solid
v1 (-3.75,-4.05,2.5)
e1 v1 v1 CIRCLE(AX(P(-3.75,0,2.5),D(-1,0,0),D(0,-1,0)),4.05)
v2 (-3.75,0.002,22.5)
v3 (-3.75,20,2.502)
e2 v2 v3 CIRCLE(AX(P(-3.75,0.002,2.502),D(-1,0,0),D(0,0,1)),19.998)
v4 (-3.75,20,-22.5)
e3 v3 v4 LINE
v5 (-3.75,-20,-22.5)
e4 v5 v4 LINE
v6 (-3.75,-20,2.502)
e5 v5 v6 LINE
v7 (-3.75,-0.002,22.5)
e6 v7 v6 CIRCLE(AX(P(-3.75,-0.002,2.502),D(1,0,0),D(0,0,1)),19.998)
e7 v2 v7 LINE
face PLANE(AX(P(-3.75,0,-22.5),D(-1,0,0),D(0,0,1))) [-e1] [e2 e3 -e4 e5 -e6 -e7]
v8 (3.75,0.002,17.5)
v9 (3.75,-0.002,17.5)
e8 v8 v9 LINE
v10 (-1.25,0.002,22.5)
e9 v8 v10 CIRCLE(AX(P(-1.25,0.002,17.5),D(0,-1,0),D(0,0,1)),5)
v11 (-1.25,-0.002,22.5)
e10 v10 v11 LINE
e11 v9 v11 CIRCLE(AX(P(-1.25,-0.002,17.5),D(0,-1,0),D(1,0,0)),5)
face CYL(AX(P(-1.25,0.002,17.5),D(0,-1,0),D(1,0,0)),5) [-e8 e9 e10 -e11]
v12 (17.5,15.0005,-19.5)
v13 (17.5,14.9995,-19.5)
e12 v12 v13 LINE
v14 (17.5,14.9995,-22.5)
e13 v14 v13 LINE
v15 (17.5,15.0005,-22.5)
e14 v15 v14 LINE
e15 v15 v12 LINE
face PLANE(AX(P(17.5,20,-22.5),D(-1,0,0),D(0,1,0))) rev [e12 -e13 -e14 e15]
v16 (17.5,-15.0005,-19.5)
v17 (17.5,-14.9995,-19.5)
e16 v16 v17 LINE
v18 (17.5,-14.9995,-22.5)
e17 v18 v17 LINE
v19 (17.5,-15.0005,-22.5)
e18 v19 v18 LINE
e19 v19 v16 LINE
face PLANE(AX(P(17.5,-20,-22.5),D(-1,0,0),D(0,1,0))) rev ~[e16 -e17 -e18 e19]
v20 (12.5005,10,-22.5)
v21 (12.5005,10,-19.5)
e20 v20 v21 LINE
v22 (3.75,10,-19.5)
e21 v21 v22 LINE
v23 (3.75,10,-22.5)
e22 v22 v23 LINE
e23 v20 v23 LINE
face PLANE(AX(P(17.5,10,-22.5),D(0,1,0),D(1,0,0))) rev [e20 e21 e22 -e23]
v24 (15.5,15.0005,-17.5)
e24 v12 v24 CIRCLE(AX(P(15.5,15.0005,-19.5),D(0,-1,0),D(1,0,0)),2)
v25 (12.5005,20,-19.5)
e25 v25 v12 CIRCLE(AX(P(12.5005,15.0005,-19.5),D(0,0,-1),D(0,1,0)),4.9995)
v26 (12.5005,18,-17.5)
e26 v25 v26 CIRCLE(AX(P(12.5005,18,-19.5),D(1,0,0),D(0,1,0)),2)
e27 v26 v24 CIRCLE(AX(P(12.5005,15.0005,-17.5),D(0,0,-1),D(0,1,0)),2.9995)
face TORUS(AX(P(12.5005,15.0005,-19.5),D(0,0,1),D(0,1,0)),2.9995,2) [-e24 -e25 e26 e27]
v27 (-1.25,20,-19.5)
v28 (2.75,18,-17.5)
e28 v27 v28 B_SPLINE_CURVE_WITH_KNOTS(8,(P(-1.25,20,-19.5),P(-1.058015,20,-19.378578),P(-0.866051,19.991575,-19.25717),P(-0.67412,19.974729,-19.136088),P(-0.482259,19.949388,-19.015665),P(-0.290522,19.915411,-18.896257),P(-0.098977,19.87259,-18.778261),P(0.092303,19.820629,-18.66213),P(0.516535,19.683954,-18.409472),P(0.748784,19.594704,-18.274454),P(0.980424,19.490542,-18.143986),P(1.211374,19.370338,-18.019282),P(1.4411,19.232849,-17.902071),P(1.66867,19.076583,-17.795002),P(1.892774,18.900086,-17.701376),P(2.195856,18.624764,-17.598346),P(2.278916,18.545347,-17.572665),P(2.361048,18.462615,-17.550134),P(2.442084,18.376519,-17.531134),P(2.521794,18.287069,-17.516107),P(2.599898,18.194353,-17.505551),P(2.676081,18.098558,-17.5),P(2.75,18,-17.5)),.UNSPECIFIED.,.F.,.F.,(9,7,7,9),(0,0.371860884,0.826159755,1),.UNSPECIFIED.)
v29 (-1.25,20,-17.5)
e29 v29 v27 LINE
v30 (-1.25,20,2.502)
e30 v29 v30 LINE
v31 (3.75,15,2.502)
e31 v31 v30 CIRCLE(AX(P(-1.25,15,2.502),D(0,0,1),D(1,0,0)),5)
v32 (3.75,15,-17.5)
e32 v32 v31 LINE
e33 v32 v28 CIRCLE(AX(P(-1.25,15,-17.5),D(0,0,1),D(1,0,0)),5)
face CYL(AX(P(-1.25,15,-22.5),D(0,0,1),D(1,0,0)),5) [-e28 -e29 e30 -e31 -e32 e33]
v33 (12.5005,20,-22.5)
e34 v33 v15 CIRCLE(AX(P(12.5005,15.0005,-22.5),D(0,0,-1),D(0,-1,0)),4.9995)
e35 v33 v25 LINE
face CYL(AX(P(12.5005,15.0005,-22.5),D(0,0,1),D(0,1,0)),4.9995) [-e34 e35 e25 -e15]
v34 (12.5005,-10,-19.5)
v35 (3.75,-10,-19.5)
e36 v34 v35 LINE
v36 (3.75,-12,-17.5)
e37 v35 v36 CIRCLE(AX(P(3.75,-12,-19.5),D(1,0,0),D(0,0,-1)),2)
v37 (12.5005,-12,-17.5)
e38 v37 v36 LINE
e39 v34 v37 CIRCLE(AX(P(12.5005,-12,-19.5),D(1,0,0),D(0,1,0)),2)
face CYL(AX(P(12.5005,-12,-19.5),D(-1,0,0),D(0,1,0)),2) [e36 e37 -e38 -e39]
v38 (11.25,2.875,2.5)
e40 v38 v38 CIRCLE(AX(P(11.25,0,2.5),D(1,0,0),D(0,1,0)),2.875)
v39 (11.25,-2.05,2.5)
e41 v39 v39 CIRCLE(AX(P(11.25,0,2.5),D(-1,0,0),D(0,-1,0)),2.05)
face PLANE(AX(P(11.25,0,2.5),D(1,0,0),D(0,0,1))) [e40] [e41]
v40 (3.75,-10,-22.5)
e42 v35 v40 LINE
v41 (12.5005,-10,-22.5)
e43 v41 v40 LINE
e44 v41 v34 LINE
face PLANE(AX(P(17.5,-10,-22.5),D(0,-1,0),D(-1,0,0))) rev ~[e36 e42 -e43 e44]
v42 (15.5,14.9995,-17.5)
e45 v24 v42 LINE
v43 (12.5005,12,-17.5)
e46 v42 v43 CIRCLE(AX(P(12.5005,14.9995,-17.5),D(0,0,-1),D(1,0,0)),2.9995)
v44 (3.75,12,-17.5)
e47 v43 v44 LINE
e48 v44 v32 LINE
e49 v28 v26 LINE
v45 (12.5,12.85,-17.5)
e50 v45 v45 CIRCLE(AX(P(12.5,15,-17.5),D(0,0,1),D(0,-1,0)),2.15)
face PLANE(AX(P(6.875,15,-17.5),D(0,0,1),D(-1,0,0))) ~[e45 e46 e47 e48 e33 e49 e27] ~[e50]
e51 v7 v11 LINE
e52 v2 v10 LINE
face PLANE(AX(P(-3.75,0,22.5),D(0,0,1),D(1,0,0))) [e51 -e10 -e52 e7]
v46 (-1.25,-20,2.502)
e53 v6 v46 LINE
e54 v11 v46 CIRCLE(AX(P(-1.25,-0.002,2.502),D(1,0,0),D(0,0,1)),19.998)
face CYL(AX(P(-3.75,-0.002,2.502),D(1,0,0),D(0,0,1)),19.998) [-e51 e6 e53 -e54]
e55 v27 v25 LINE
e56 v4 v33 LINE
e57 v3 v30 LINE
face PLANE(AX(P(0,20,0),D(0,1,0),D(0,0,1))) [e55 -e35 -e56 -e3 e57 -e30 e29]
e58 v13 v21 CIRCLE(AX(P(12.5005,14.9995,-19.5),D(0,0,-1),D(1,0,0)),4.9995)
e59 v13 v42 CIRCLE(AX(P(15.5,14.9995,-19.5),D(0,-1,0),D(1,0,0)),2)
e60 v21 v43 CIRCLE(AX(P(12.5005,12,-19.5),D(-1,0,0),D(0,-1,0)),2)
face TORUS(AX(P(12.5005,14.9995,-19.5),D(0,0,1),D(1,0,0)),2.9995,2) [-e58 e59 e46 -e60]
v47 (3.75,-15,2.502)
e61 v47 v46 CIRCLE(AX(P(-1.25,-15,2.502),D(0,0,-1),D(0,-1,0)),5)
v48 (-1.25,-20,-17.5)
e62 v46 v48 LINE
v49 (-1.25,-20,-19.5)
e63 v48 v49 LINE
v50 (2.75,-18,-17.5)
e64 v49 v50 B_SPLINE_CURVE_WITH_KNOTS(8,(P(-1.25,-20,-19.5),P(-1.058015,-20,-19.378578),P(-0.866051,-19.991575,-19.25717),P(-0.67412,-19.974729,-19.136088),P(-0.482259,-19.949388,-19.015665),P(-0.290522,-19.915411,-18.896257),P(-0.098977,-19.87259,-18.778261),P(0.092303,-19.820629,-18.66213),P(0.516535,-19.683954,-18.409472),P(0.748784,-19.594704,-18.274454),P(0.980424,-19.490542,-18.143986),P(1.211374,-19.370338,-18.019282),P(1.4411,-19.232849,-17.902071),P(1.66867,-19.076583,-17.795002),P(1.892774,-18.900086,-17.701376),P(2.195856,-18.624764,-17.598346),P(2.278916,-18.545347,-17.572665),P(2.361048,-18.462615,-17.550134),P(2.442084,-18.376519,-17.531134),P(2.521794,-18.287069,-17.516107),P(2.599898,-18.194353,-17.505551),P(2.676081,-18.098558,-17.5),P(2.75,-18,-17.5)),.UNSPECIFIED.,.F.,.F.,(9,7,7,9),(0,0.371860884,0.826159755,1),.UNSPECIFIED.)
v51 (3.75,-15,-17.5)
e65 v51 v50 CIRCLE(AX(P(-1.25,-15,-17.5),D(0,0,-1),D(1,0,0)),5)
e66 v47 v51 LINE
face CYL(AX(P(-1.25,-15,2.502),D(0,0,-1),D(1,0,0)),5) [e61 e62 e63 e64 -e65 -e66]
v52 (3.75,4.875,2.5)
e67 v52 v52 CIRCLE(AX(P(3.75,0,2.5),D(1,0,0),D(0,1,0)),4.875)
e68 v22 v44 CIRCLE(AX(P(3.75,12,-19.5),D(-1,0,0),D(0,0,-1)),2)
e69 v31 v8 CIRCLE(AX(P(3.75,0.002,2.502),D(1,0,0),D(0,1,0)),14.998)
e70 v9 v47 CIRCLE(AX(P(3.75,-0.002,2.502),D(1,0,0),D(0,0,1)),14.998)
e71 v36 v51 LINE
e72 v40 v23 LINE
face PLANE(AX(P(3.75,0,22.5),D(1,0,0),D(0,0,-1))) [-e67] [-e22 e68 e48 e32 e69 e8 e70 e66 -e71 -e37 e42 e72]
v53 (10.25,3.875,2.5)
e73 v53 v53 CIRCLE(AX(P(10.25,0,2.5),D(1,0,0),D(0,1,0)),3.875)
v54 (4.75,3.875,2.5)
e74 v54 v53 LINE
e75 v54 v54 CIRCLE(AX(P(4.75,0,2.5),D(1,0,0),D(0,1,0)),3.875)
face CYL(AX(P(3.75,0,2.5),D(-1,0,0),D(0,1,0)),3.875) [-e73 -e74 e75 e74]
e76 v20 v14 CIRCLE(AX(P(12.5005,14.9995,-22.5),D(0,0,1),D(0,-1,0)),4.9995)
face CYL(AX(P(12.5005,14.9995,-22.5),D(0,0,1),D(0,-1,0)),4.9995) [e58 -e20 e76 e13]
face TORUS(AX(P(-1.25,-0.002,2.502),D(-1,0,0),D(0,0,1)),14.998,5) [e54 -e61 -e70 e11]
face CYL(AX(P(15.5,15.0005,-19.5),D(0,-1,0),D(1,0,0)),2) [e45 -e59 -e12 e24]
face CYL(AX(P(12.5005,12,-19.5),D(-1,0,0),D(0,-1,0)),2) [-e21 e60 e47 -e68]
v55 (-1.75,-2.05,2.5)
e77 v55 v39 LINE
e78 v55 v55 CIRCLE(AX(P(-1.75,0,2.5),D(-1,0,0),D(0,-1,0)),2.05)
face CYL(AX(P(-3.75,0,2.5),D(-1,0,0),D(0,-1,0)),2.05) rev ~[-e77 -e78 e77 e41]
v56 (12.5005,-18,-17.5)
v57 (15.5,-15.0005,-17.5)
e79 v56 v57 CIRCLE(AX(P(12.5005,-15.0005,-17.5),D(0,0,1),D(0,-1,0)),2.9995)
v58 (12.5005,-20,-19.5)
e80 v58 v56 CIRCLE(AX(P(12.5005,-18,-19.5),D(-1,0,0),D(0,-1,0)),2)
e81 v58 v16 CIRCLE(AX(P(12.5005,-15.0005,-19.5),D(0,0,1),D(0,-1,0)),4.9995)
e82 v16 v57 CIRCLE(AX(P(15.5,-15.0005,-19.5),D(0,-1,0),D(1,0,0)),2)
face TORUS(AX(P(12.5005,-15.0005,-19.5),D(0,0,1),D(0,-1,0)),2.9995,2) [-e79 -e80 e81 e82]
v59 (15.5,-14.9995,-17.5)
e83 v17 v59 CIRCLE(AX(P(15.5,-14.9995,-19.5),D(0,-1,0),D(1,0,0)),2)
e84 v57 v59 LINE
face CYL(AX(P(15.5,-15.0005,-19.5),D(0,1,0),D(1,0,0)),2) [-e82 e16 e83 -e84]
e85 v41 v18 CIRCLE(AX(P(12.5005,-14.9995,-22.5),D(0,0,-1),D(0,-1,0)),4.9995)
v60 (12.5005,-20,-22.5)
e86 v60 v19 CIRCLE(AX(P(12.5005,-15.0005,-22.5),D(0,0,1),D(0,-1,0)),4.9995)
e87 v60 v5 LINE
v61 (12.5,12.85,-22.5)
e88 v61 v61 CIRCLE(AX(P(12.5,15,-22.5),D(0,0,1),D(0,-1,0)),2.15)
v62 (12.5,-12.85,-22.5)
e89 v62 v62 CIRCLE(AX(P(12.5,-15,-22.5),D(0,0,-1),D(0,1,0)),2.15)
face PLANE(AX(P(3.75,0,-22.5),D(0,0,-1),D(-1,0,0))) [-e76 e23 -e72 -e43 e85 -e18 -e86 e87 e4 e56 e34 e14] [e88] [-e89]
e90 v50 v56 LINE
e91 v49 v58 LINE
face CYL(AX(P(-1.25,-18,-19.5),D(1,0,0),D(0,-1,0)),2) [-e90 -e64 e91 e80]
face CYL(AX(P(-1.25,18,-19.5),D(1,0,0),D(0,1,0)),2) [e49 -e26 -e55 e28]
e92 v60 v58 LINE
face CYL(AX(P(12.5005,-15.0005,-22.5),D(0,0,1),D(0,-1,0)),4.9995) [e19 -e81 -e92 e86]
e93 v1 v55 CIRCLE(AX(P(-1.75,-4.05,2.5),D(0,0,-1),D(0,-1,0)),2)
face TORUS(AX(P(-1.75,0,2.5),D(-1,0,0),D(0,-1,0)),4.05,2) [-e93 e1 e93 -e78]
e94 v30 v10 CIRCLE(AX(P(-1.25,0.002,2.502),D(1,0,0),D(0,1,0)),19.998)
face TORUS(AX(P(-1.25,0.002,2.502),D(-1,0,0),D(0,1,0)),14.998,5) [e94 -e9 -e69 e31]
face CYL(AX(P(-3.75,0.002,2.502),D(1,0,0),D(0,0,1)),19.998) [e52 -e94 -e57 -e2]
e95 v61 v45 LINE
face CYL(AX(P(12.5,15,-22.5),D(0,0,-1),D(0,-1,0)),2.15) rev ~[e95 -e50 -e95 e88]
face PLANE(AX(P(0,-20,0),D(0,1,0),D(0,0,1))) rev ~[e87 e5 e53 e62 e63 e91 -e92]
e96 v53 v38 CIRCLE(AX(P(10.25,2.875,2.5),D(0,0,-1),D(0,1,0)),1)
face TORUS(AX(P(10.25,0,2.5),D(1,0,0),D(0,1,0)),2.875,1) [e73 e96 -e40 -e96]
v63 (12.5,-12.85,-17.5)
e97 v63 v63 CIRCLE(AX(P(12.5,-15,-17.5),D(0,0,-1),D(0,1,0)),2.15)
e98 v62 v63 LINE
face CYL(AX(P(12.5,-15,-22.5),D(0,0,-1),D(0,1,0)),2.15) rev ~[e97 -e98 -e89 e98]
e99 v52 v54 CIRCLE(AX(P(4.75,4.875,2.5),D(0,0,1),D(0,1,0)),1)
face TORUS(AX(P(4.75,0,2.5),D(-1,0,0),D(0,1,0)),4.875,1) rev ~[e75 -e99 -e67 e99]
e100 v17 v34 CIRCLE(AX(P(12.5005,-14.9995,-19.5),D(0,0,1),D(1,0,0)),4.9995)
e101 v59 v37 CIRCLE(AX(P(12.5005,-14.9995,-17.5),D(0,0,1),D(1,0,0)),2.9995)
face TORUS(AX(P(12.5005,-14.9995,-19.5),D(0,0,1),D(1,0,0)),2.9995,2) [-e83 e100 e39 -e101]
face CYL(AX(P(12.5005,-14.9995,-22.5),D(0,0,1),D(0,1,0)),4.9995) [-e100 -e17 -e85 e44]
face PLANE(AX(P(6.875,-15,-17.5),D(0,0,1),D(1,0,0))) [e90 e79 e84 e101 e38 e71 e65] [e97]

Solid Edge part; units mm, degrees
sketch "Sketch1" plane through (0, 0, 0) normal (0, -1, 0) x (1, 0, 0)
  line L0 (3.75, 22.5) -> (3.75, -22.5)
  line L1 (3.75, -22.5) -> (-3.75, -22.5)
  line L2 (-3.75, -22.5) -> (-3.75, 22.5)
  line L3 (-3.75, 22.5) -> (3.75, 22.5)
extrude "Protrusion1" add sketch "Sketch1" along normal mid plane 40
fillet "Round_1" radius 20 2 edges at (0, -20, 22.5) (0, 20, 22.5)
sketch "Sketch2" plane through (3.75, 0, 0) normal (1, 0, 0) x (0, 1, 0)
  circle A0 centre (0, 2.5) radius 3.875
extrude "ExtrudedProtrusion_2" add sketch "Sketch2" along normal mid plane 15
fillet "Round_2" radius 5 3 edges at (3.75, 0, 22.5) (3.75, -20, -10) (3.75, 20, -10)
fillet "Round_3" radius 1 2 edges at (3.75, 0, 6.375) (11.25, -3.875, 2.5)
sketch "Sketch3" plane through (0, 0, -22.5) normal (0, 0, -1) x (0, 1, 0)
  circle A0 centre (-15, 12.5) radius 2.15
  line L0 (-20, 17.5) -> (-10, 17.5)
  line L1 (-10, 17.5) -> (-10, -3.75)
  line L2 (-10, -3.75) -> (-20, -3.75)
  line L3 (-20, -3.75) -> (-20, 17.5)
  dimension "D1" = 4.3
  dimension "D2" = 10
  dimension "D3" = 21.25
  dimension "D4" = 5
extrude "ExtrudedProtrusion_3" add sketch "Sketch3" against normal blind 5
fillet "Round_4" radius 5 2 edges at (17.5, -20, -20) (17.5, -10, -20)
mirror "Mirror1" about plane through (0, 0, 0) normal (0, -1, 0) of "ExtrudedProtrusion_3"
fillet "Round1" radius 5 2 edges at (17.5, 20, -20) (17.5, 10, -20)
sketch "Sketch4" plane through (-3.75, 0, 0) normal (-1, 0, 0) x (0, -1, 0)
  circle A0 centre (0, 2.5) radius 2.05
extrude "Cutout1" cut sketch "Sketch4" against normal through all
fillet "Round_6" radius 2 1 edges at (-3.75, 2.05, 2.5)
fillet "Round_7" radius 2 4 edges at (8.125, -10, -17.5) (5.625, -20, -17.5) (8.125, 10, -17.5) (5.625, 20, -17.5)
